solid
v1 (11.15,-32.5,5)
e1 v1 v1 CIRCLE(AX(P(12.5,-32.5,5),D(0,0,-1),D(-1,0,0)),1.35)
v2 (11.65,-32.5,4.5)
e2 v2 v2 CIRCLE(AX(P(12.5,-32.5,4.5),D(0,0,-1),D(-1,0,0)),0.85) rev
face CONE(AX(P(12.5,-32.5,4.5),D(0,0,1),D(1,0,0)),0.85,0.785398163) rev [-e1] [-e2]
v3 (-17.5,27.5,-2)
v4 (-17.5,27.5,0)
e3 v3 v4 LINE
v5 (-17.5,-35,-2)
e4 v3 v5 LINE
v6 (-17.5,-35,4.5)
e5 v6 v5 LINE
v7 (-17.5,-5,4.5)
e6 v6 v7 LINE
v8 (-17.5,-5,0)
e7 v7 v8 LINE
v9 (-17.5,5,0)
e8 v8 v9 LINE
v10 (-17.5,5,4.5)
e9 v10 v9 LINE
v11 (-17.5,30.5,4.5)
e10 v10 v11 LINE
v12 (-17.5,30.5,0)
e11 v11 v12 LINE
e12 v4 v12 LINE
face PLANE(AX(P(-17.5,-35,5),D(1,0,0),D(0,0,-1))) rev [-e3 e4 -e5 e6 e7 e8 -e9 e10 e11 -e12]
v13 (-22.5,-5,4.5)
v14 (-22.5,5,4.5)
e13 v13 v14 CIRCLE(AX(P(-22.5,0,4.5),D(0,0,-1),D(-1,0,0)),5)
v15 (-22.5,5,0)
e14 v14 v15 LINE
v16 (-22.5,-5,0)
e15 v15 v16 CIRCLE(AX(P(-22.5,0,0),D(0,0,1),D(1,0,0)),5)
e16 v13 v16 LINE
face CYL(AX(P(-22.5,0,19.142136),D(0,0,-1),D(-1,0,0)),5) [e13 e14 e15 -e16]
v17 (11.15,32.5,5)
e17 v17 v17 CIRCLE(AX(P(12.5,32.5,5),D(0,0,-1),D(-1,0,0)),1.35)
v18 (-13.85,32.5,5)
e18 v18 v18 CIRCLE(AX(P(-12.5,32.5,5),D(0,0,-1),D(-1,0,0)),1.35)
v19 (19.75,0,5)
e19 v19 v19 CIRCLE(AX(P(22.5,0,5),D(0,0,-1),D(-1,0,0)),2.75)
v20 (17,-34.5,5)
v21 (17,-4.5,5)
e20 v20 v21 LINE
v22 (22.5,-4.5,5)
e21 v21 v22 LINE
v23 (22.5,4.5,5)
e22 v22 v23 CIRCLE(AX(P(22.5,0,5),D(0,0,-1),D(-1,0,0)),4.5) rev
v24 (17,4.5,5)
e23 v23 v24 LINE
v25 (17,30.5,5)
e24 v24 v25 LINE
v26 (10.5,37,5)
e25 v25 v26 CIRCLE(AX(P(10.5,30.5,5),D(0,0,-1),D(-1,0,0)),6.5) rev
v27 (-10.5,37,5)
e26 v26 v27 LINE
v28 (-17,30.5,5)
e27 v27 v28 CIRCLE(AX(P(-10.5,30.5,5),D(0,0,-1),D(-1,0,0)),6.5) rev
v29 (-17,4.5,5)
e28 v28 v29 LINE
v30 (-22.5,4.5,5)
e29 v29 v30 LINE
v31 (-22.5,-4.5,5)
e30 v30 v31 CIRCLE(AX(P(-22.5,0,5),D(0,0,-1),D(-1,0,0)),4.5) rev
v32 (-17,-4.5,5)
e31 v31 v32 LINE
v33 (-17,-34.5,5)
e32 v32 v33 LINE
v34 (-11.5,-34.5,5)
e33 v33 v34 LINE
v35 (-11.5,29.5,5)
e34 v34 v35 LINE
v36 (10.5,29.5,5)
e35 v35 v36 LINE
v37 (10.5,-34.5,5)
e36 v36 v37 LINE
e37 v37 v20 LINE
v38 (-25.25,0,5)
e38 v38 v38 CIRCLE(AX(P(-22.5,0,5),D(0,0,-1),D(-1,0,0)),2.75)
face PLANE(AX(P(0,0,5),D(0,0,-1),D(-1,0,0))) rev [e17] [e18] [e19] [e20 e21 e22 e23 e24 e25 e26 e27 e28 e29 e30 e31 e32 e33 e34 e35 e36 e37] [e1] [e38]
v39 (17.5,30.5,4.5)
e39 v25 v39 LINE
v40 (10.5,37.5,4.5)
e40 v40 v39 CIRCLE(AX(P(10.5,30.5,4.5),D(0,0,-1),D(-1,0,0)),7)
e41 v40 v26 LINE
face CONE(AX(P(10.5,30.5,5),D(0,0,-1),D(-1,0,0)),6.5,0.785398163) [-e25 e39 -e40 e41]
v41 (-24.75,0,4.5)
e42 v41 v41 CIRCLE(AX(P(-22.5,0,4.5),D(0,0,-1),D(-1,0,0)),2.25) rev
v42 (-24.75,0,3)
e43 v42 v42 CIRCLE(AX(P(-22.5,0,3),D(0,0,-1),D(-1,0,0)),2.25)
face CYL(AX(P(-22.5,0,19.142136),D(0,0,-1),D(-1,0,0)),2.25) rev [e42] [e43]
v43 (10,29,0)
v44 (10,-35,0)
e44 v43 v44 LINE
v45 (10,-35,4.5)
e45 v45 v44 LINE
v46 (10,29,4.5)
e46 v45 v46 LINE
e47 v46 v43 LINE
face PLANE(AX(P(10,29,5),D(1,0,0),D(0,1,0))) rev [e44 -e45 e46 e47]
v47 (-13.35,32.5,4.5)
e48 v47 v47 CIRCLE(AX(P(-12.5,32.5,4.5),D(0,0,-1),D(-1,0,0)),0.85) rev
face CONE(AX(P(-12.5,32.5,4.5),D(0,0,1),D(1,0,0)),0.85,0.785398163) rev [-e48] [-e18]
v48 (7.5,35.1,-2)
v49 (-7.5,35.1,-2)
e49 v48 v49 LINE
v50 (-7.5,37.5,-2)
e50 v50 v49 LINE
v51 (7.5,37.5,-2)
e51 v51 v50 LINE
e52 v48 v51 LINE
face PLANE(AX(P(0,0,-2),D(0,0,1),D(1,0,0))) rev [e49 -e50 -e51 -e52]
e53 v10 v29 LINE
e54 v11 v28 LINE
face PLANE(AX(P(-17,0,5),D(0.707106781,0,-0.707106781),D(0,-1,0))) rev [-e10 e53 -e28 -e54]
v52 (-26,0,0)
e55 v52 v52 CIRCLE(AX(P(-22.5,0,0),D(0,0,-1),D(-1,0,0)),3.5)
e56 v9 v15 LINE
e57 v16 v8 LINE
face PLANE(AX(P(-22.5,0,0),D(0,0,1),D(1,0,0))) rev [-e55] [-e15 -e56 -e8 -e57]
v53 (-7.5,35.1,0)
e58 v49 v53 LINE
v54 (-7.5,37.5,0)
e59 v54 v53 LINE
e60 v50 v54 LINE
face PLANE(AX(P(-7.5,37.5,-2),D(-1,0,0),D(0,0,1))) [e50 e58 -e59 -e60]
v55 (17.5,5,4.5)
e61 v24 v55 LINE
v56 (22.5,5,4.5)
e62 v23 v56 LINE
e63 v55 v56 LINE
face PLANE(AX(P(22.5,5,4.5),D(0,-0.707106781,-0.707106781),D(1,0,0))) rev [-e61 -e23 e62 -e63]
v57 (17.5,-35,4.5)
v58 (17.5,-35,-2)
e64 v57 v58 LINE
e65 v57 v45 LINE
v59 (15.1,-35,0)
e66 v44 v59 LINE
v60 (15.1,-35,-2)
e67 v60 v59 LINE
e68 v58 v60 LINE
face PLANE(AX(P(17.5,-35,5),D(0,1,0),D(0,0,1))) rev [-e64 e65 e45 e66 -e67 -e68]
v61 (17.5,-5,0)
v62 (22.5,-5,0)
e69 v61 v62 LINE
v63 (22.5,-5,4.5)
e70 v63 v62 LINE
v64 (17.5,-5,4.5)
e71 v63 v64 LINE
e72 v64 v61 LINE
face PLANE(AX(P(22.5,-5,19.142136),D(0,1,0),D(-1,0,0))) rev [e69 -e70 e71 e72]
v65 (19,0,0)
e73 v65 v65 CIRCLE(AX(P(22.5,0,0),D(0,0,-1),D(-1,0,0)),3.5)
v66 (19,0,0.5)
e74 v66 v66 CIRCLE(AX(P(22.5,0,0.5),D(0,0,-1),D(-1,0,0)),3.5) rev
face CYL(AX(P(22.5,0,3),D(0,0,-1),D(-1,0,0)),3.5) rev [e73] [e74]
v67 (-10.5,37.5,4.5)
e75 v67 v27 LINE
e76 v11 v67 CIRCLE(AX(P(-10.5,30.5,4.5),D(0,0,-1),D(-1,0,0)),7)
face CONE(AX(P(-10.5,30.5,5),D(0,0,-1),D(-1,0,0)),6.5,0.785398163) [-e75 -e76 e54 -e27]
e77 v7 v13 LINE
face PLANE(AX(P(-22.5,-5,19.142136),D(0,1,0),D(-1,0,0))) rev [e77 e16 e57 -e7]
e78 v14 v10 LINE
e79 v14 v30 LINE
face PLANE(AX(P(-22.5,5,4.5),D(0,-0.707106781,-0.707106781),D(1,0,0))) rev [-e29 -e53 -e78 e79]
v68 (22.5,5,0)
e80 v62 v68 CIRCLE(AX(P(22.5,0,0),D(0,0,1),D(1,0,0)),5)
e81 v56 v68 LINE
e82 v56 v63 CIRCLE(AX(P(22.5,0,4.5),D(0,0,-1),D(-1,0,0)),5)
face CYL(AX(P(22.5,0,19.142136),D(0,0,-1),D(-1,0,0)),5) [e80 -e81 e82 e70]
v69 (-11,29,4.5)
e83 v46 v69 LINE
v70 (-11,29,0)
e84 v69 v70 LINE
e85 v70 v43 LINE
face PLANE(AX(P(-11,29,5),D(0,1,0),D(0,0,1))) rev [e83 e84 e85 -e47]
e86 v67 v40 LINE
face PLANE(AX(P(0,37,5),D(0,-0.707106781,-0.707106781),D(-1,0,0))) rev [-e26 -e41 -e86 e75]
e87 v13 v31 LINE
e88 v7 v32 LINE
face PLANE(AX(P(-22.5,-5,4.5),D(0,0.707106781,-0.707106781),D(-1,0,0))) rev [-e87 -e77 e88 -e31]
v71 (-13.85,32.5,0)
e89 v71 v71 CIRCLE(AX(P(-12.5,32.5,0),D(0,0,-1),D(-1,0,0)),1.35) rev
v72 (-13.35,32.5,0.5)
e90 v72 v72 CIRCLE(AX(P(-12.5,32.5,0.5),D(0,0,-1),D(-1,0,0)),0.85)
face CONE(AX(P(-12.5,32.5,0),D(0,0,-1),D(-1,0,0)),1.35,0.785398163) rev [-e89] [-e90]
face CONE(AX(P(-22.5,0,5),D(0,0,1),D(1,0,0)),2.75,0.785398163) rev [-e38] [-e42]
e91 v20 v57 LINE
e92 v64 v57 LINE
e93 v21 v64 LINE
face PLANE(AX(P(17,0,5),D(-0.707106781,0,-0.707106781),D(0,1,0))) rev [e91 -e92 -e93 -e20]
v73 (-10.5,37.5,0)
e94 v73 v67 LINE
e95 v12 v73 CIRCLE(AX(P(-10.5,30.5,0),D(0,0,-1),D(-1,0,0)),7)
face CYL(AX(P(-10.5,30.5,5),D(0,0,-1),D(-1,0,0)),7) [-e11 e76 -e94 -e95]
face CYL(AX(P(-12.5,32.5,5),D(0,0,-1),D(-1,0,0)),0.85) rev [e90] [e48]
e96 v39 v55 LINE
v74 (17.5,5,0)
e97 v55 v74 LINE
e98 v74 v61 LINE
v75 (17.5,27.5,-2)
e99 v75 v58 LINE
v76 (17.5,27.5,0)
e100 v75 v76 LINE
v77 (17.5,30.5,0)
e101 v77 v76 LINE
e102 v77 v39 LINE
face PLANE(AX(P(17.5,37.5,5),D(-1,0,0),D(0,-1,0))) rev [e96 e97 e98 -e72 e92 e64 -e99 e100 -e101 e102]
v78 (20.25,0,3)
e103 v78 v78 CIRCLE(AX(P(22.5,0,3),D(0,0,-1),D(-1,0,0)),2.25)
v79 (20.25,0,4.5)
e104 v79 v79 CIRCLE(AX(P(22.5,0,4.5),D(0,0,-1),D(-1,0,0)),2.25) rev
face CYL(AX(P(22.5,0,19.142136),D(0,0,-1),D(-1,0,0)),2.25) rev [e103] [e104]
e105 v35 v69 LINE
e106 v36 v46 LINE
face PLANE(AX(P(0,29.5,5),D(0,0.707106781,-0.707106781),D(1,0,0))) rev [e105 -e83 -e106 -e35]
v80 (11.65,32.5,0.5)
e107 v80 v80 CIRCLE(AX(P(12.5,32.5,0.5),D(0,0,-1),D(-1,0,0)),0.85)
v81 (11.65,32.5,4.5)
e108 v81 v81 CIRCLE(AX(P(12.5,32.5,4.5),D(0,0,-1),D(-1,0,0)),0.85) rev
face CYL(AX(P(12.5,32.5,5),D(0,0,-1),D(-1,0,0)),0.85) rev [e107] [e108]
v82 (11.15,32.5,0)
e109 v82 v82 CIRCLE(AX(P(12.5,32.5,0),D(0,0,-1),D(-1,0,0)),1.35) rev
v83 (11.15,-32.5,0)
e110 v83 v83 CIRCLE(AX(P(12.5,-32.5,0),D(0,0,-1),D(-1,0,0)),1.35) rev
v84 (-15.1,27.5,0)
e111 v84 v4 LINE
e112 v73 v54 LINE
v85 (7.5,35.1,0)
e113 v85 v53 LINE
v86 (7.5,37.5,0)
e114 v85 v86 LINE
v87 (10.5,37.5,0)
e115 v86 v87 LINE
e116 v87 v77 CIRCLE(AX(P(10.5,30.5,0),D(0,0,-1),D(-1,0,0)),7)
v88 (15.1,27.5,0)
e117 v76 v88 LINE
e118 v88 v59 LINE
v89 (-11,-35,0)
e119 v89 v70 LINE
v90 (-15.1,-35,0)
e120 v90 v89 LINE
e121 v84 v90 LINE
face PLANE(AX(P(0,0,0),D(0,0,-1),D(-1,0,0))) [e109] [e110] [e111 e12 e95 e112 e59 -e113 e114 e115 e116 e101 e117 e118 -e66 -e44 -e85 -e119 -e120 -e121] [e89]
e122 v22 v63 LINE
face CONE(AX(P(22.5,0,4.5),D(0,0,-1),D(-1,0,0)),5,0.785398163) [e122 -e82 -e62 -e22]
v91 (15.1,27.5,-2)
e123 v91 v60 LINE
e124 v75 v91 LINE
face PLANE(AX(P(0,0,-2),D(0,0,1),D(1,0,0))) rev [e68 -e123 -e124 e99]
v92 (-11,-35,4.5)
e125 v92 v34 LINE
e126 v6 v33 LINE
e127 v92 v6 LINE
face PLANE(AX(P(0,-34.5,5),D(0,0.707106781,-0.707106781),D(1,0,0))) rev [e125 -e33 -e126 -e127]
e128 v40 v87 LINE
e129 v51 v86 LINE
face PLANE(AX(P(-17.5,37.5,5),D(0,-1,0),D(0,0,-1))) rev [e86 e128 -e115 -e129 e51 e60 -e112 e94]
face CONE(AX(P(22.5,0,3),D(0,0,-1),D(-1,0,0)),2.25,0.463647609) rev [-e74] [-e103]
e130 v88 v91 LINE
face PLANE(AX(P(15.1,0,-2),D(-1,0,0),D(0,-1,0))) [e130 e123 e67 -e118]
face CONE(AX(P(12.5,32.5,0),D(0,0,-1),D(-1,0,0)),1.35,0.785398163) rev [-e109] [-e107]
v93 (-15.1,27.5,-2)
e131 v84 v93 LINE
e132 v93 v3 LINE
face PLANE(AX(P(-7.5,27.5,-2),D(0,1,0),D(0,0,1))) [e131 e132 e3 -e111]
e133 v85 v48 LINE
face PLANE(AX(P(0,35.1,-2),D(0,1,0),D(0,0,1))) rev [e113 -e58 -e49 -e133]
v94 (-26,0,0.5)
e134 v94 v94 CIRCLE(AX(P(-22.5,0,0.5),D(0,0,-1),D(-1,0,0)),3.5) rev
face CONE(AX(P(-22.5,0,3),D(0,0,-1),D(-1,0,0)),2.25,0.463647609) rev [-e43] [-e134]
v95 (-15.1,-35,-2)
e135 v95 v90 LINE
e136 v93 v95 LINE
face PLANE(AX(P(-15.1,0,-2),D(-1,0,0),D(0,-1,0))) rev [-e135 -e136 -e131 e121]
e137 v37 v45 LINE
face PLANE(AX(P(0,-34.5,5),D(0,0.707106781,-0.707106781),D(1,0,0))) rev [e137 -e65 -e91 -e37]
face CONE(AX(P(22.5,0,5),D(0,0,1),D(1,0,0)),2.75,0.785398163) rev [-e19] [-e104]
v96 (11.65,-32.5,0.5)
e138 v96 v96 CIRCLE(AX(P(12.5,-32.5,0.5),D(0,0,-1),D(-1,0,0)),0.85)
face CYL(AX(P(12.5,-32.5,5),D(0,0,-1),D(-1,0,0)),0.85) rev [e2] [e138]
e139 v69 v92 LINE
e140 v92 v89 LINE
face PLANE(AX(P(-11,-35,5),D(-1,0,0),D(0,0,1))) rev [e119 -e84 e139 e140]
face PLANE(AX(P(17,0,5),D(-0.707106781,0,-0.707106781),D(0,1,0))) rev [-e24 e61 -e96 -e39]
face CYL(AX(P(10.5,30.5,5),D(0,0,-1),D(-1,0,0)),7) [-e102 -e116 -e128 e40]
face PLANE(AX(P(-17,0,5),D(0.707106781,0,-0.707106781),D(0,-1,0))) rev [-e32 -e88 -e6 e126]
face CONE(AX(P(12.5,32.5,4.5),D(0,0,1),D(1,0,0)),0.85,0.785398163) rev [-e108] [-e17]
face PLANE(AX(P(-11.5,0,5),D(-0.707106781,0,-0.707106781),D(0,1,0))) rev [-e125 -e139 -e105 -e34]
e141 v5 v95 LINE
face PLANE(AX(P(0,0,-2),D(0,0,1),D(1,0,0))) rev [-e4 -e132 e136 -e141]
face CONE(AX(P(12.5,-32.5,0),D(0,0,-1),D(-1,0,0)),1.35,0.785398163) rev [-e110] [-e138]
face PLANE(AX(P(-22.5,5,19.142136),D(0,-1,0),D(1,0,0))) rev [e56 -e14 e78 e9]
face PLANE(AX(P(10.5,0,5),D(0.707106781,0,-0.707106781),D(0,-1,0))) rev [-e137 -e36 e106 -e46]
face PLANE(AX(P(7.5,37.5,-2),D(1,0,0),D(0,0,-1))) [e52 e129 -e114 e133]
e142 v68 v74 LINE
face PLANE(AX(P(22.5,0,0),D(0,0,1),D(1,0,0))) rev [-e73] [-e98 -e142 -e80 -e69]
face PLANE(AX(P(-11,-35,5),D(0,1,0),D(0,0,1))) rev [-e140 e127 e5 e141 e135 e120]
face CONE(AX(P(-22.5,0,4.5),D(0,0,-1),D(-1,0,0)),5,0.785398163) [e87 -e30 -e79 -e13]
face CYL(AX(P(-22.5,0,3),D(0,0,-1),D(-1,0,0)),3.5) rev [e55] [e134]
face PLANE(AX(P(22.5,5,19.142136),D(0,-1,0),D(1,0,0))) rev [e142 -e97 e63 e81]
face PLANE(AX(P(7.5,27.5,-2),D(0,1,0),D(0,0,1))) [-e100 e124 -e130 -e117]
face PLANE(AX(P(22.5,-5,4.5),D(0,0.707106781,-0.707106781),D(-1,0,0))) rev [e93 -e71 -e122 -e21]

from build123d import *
from OCP.BRepFilletAPI import BRepFilletAPI_MakeChamfer

# Parameters (mm, degrees)
SKETCH1_R           = 0.85
BOSS_EXTRUDE1_DEPTH = 5
BOSS_EXTRUDE2_DEPTH = 2
SKETCH3_R           = 2.25
BOSS_EXTRUDE3_DEPTH = 5
SKETCH4_R           = 3.5
CUT_EXTRUDE1_DEPTH  = 3
SKETCH5_W           = 10
SKETCH5_H           = 10
CUT_EXTRUDE2_DEPTH  = 47.770717335
FILLET1_R           = 7
CHAMFER3_SIZE       = 0.5
CHAMFER1_SIZE       = 2.5
CHAMFER1_SIZE_2     = 1.25


with BuildPart() as part:
    # Sketch1 → Boss-Extrude1 (new body)
    with BuildSketch(Plane.XY):
        Polygon((-11, -35), (-11, 29), (10, 29), (10, -35), (17.5, -35), (17.5, 37.5), (-17.5, 37.5), (-17.5, -35), align=None)
        with Locations((-12.5, 32.5)):
            Circle(SKETCH1_R, mode=Mode.SUBTRACT)
        with Locations((12.5, 32.5)):
            Circle(SKETCH1_R, mode=Mode.SUBTRACT)
        with Locations((12.5, -32.5)):
            Circle(SKETCH1_R, mode=Mode.SUBTRACT)
    extrude(amount=BOSS_EXTRUDE1_DEPTH)

    # Sketch2 → Boss-Extrude2 (add)
    with BuildSketch(Plane.XY):
        Polygon((17.5, -35), (17.5, 37.5), (-17.5, 37.5), (-17.5, -35), (-15.1, -35), (-15.1, 35.1), (15.1, 35.1), (15.1, -35), align=None)
    extrude(amount=-BOSS_EXTRUDE2_DEPTH)

    # Sketch3 → Boss-Extrude3 (add)
    # profile 1 of 2: a face of its own
    with BuildSketch(Plane.XY):
        with BuildLine():
            Line((22.5, 5), (17.5, 5))
            Line((17.5, 5), (17.5, -5))
            Line((17.5, -5), (22.5, -5))
            ThreePointArc((22.5, -5), (27.5, 0), (22.5, 5))
        make_face()
        with Locations(Location((22.5, 0, 0), (0, 0, 180))):
            Circle(SKETCH3_R, mode=Mode.SUBTRACT)
    # profile 2 of 2: a face of its own
    with BuildSketch(Plane.XY):
        with BuildLine():
            Line((-22.5, 5), (-17.5, 5))
            Line((-17.5, 5), (-17.5, -5))
            Line((-17.5, -5), (-22.5, -5))
            ThreePointArc((-22.5, -5), (-27.5, 0), (-22.5, 5))
        make_face()
        with Locations(Location((-22.5, 0, 0), (0, 0, 180))):
            Circle(SKETCH3_R, mode=Mode.SUBTRACT)
    extrude(amount=BOSS_EXTRUDE3_DEPTH)

    # Sketch4 → Cut-Extrude1 (cut)
    with BuildSketch(Plane(origin=(0, 0, 0), x_dir=(-1, 0, 0), z_dir=(0, 0, -1))):
        with Locations((-22.5, 0)):
            Circle(SKETCH4_R)
        with Locations((22.5, 0)):
            Circle(SKETCH4_R)
    extrude(amount=-CUT_EXTRUDE1_DEPTH, mode=Mode.SUBTRACT)

    # Sketch5 → Cut-Extrude2 (cut, through all)
    with BuildSketch(Plane(origin=(0, 0, 0), x_dir=(-1, 0, 0), z_dir=(0, 0, -1))):
        with Locations((-12.5, 32.5)):
            Rectangle(SKETCH5_W, SKETCH5_H)
        with Locations((12.5, 32.5)):
            Rectangle(SKETCH5_W, SKETCH5_H)
    extrude(amount=CUT_EXTRUDE2_DEPTH, mode=Mode.SUBTRACT)

    # Fillet1
    fillet1_edges = [part.edges().sort_by_distance(p)[0] for p in [
        (-17.5, 37.5, 2.5),
        (17.5, 37.5, 2.5),
    ]]
    fillet(fillet1_edges, radius=FILLET1_R)

    # Chamfer3
    chamfer3_edges = [part.edges().sort_by_distance(p)[0] for p in [
        (-0.5, 29, 5),
        (-17.5, 17.75, 5),
        (0, 37.5, 5),
        (15.449747468, 35.449747468, 5),
        (-15.449747468, 35.449747468, 5),
        (10, -3, 5),
        (13.75, -35, 5),
        (-13.35, 32.5, 0),
        (-13.35, 32.5, 5),
        (17.5, -20, 5),
        (11.65, 32.5, 0),
        (11.65, 32.5, 5),
        (11.65, -32.5, 0),
        (11.65, -32.5, 5),
        (-14.25, -35, 5),
        (17.5, 17.75, 5),
        (27.5, 0, 5),
        (20, 5, 5),
        (20, -5, 5),
        (24.75, 0, 5),
        (-17.5, -20, 5),
        (-27.5, 0, 5),
        (-20, -5, 5),
        (-20, 5, 5),
        (-20.25, 0, 5),
        (-11, -3, 5),
    ]]
    chamfer(chamfer3_edges, length=CHAMFER3_SIZE)

    # Chamfer1
    chamfer1_edges_1 = [part.edges().sort_by_distance(p)[0] for p in [
        (26, 0, 3),
    ]]
    chamfer1_side_1 = [part.faces().sort_by_distance(p)[0] for p in [
        (26, 0, 2.975),
    ]]
    chamfer1_edges_2 = [part.edges().sort_by_distance(p)[0] for p in [
        (-19, 0, 3),
    ]]
    chamfer1_side_2 = [part.faces().sort_by_distance(p)[0] for p in [
        (-19, 0, 2.975),
    ]]
    chamfer1 = BRepFilletAPI_MakeChamfer(part.part.solid().wrapped)
    for e in chamfer1_edges_1:
        chamfer1.Add(CHAMFER1_SIZE - 0.0001, CHAMFER1_SIZE_2 - 0.0001, e.wrapped, chamfer1_side_1[0].wrapped)
    for e in chamfer1_edges_2:
        chamfer1.Add(CHAMFER1_SIZE - 0.0001, CHAMFER1_SIZE_2 - 0.0001, e.wrapped, chamfer1_side_2[0].wrapped)
    add(Compound.cast(chamfer1.Shape()), mode=Mode.REPLACE)  # a hair under: the kernel refuses the full size


solid = part.part
